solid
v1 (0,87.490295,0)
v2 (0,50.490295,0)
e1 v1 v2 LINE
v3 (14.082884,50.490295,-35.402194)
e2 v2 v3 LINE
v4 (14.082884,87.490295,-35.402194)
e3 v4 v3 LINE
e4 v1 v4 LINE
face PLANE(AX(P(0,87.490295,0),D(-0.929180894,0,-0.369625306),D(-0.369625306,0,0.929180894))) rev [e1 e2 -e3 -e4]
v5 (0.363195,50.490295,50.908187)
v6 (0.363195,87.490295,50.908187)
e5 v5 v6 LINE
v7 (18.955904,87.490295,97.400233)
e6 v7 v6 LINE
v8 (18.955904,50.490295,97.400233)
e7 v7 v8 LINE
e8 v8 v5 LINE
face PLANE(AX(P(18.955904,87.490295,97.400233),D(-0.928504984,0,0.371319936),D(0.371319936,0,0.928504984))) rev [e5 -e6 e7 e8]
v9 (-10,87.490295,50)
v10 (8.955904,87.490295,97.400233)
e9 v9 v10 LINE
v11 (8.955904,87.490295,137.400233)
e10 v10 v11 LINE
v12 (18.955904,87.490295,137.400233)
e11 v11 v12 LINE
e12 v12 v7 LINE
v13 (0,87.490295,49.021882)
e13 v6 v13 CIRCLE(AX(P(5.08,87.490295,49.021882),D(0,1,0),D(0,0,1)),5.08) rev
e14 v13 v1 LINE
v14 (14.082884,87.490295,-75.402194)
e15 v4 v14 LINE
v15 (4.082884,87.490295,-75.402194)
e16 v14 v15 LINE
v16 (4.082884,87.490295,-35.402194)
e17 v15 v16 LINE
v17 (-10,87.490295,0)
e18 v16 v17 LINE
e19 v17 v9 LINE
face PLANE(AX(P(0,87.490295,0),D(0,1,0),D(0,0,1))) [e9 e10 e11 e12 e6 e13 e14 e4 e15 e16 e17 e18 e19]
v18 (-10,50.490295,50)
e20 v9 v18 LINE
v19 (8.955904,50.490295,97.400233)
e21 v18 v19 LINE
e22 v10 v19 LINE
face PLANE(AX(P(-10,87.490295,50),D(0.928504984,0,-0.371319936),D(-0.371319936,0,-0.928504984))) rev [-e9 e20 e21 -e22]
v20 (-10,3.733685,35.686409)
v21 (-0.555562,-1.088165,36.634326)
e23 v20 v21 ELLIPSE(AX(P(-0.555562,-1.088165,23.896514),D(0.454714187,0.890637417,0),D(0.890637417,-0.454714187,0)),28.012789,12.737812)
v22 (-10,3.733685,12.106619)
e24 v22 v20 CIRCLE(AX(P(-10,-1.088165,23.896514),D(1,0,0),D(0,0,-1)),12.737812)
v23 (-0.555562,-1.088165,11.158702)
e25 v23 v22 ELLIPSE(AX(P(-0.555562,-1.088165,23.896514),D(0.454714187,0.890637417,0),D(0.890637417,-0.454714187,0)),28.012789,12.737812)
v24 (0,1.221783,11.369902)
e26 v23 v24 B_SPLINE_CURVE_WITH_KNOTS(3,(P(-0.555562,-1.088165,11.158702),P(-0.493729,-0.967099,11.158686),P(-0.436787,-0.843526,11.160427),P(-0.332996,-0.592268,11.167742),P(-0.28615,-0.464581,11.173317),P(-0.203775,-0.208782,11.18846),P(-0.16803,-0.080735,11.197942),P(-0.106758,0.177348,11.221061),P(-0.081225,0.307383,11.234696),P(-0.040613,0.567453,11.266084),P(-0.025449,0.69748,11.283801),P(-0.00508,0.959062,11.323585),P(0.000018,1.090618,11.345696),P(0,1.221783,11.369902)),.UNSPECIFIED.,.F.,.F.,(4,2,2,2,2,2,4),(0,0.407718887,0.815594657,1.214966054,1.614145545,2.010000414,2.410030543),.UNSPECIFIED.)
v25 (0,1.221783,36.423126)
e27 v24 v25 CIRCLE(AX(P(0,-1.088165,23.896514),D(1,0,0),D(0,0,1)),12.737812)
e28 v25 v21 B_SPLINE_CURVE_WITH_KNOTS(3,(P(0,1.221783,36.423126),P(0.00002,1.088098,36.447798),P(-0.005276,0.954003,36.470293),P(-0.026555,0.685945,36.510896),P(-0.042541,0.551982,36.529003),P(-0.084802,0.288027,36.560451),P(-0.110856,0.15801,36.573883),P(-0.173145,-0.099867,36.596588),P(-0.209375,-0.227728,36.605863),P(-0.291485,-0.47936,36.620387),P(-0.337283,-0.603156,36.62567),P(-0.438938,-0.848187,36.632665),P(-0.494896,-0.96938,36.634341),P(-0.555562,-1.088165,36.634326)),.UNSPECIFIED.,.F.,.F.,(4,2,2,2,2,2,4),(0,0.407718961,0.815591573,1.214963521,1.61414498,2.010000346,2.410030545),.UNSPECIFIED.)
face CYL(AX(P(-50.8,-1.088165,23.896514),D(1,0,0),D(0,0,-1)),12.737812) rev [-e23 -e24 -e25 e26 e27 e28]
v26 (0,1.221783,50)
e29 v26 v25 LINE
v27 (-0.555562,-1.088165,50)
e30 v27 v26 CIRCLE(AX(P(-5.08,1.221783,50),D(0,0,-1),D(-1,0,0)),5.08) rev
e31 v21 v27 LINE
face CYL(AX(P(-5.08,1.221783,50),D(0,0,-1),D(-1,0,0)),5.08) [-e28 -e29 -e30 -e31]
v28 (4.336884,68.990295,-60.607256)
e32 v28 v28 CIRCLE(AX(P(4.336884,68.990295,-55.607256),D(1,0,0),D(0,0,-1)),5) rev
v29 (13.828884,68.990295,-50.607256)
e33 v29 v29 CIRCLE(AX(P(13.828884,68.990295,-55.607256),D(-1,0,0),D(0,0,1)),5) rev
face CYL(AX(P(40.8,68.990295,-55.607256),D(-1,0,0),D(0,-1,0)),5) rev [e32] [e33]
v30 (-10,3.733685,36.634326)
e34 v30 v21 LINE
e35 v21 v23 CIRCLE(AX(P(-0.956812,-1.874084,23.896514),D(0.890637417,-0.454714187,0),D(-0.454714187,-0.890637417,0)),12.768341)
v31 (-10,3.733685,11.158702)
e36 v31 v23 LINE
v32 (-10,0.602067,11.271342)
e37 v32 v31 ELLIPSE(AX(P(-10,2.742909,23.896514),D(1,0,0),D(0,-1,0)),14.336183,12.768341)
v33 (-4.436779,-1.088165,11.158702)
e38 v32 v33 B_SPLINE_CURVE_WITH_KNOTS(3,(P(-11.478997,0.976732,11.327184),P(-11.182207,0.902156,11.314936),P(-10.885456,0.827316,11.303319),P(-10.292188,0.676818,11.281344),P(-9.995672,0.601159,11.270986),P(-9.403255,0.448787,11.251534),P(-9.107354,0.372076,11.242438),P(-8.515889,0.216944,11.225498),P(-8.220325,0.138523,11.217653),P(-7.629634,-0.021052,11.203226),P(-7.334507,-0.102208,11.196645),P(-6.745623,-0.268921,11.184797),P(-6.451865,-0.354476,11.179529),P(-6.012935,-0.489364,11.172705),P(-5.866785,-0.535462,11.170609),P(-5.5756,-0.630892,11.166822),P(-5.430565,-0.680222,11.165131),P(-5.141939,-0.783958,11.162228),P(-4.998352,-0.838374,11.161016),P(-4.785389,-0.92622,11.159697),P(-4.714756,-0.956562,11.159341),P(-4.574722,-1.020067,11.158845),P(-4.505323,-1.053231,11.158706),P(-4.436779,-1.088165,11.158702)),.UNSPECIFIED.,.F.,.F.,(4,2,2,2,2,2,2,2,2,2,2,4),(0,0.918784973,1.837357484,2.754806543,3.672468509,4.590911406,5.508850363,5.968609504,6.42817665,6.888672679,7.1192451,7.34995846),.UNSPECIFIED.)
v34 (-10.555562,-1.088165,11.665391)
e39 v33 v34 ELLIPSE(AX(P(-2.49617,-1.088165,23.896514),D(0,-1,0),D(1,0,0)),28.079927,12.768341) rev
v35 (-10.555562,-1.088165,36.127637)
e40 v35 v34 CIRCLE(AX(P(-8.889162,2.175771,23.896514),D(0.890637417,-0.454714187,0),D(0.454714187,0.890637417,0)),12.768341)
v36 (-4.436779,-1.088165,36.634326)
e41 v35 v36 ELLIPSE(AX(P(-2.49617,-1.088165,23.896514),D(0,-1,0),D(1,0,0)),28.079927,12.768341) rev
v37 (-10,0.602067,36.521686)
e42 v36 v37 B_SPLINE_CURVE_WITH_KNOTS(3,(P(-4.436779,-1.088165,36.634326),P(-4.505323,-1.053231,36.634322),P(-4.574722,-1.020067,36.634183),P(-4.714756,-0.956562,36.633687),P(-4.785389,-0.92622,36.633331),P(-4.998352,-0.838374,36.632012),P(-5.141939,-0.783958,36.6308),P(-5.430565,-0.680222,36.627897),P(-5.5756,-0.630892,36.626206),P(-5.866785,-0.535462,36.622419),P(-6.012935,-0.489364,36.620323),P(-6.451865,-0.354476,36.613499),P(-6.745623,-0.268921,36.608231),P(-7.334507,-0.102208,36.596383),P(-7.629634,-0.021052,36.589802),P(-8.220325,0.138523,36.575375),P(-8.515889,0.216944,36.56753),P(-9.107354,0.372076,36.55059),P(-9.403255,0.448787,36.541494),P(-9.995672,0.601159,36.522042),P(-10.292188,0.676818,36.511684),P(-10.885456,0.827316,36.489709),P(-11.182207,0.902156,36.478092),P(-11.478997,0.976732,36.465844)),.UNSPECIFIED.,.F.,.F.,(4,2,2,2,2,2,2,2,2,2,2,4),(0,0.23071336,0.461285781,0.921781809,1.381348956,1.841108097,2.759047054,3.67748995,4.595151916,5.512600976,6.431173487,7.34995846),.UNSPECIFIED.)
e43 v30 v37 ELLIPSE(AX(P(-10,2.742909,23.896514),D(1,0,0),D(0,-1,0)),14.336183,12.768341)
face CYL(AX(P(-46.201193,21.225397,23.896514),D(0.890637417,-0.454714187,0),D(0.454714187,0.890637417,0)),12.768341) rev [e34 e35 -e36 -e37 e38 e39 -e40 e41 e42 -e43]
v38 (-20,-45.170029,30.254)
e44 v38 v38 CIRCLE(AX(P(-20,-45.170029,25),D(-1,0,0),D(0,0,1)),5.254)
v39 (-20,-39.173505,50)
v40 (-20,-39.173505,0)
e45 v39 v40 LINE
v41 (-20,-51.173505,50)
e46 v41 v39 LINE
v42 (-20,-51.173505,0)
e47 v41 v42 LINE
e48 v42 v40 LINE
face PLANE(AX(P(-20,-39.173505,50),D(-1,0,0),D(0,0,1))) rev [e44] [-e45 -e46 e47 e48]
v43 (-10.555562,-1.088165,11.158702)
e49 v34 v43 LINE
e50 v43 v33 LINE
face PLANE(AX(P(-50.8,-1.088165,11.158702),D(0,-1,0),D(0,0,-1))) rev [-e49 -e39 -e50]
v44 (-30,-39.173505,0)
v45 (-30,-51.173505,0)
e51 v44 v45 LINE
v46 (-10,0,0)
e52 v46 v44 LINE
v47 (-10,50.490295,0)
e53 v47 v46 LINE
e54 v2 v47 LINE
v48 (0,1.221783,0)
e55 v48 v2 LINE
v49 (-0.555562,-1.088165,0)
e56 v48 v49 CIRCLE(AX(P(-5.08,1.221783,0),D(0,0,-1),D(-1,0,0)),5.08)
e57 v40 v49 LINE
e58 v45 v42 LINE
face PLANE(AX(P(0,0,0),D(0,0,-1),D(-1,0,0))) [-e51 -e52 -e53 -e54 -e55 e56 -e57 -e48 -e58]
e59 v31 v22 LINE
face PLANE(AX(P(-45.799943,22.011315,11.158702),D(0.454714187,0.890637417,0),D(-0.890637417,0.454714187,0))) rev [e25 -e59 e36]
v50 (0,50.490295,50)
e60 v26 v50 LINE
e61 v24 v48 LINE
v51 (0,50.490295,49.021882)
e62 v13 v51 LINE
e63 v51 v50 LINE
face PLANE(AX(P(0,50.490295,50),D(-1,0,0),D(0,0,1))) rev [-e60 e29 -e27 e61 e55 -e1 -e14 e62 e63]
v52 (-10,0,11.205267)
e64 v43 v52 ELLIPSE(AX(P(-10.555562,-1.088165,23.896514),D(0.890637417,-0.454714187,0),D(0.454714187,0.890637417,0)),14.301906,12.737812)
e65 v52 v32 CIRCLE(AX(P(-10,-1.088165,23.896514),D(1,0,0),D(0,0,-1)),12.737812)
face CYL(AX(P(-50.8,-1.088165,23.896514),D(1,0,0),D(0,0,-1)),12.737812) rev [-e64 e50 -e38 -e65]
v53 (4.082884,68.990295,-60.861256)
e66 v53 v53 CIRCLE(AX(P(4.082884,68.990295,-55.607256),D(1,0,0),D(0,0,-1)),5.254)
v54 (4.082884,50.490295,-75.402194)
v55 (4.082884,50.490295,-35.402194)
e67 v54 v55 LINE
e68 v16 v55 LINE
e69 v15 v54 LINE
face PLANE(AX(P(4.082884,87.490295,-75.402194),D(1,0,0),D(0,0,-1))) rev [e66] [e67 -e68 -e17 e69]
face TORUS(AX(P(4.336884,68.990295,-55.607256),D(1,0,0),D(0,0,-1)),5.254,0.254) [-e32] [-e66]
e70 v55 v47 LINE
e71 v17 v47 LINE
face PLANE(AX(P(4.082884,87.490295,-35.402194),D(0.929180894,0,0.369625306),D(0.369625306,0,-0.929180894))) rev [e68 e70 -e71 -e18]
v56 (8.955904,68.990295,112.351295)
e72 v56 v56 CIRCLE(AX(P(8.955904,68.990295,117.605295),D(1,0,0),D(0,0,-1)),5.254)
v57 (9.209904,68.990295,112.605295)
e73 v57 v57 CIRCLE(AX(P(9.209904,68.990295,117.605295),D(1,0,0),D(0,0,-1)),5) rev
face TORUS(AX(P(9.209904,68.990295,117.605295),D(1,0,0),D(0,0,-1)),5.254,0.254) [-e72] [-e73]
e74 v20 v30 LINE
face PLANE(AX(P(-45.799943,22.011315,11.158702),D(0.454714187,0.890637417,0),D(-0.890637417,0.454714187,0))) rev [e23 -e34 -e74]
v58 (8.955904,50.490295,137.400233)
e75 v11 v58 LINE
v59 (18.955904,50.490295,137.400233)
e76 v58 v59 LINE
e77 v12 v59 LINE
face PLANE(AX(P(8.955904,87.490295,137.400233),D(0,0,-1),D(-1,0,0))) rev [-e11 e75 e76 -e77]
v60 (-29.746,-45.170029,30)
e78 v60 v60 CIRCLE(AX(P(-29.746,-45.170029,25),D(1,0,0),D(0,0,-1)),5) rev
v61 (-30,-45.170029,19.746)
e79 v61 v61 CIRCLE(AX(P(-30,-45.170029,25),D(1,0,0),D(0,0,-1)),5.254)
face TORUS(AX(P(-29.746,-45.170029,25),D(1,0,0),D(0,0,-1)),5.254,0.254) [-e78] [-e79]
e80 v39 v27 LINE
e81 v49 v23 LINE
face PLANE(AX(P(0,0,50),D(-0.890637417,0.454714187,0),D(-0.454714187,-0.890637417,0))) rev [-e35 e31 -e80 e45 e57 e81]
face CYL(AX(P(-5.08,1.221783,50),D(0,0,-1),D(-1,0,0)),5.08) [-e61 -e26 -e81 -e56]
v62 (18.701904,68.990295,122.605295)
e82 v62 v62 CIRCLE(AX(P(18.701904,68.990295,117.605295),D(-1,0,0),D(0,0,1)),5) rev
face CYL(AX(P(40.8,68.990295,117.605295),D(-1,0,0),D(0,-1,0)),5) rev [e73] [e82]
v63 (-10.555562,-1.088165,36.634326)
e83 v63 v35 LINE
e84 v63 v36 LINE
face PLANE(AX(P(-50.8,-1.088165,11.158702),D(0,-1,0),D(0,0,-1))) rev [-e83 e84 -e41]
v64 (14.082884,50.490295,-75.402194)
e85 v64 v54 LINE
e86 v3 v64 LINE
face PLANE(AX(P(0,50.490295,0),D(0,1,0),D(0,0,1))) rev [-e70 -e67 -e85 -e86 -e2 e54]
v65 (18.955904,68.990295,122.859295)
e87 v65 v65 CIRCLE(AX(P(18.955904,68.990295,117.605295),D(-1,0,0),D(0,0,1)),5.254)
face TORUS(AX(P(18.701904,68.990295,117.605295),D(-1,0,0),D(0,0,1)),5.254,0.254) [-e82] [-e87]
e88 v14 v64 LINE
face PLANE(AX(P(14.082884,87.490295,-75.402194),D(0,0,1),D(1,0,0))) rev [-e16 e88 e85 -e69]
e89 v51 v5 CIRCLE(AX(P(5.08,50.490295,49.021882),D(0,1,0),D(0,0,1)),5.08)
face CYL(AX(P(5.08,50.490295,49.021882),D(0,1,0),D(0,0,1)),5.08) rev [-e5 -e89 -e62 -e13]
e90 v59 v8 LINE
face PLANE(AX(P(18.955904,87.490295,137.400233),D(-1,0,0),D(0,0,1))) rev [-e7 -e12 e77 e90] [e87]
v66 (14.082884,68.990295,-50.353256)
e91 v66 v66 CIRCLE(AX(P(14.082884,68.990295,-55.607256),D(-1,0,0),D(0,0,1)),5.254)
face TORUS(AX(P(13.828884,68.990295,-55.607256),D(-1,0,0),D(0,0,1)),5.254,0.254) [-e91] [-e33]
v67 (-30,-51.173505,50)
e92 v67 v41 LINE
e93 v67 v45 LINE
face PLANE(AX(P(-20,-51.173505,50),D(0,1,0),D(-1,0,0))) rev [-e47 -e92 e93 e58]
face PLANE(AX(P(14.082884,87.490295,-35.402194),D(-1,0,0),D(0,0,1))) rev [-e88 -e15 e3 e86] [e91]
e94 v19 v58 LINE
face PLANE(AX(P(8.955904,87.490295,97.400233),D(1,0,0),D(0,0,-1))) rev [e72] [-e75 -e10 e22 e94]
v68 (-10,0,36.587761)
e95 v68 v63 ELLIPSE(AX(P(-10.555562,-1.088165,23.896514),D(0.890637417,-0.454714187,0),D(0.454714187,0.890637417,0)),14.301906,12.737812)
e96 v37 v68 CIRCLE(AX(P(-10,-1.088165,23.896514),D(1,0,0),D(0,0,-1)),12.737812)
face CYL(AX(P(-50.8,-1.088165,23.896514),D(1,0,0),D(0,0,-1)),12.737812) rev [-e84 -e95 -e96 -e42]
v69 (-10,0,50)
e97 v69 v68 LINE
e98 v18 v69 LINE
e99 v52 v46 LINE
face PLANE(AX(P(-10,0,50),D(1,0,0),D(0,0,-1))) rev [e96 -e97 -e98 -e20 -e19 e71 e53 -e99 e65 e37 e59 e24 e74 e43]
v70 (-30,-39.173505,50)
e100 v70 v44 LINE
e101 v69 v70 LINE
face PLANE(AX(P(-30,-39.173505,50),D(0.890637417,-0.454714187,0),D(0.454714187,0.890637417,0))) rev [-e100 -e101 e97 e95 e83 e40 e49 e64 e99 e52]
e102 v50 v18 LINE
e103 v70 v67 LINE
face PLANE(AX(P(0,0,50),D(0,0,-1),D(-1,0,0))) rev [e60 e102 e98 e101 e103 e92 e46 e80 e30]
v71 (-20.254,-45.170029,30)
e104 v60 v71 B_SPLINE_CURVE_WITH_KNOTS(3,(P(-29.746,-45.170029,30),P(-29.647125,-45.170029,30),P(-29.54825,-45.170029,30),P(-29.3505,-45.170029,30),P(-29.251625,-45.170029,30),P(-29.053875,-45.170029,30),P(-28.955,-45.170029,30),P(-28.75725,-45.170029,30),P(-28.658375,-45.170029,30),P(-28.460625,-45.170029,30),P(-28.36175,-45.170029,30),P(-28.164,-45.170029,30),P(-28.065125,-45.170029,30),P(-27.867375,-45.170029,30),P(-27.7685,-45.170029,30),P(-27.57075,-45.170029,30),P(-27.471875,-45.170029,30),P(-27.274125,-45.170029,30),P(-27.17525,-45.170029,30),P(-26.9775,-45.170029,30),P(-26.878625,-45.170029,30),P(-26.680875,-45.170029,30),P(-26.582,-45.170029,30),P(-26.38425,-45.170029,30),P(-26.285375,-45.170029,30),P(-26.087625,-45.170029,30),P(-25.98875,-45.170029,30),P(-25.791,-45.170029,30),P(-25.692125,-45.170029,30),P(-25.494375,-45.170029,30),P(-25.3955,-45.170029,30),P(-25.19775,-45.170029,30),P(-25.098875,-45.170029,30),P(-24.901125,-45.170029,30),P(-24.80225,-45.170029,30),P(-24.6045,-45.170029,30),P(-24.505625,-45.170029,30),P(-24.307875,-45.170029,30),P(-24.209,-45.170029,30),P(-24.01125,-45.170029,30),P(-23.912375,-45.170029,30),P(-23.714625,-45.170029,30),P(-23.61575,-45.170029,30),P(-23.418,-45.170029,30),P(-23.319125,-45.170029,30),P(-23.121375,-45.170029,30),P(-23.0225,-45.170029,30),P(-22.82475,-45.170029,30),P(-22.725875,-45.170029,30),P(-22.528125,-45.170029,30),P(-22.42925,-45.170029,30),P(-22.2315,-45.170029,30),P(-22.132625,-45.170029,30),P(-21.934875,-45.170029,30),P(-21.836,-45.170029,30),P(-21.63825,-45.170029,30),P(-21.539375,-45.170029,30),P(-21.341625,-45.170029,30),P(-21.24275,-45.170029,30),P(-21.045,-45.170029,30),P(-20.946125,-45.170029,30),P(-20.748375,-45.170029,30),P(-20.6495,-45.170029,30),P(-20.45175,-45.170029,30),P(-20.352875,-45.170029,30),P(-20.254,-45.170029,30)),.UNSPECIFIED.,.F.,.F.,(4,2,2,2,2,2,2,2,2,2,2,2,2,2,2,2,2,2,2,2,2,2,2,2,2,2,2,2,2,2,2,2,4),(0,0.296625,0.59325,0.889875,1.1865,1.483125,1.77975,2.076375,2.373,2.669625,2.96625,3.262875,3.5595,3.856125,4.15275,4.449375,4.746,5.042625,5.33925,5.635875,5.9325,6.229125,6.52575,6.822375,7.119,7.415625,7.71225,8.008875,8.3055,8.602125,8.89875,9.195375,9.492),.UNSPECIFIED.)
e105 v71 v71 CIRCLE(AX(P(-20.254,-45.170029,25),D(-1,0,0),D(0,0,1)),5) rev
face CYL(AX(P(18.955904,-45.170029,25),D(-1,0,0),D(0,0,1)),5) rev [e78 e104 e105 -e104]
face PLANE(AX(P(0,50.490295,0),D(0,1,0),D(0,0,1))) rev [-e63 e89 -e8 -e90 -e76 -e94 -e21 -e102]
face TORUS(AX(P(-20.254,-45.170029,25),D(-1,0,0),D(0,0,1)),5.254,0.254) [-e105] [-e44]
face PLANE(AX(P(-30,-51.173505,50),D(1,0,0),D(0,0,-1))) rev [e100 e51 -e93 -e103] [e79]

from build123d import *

# Parameters (mm, degrees)
BOSS_EXTRUDE1_DEPTH = 50
BOSS_EXTRUDE2_DEPTH = 37
FILLET1_R           = 5.08
FILLET2_R           = 5.08
SKETCH3_R           = 5
CUT_EXTRUDE3_DEPTH  = 50.8
SKETCH4_R           = 5
CUT_EXTRUDE4_DEPTH  = 171.088377471
FILLET4_R           = 0.254
FILLET5_R           = 0.254
FILLET6_R           = 0.254
FILLET7_R           = 0.254
FILLET8_R           = 0.254
FILLET9_R           = 0.254
CUT_EXTRUDE10_DEPTH = 50.8
CUT_EXTRUDE11_DEPTH = 50.8


with BuildPart() as part:
    # Sketch1 → Boss-Extrude1 (new body)
    with BuildSketch(Plane.XY):
        Polygon((-10, 50.490294942), (0, 50.490294942), (0, 0), (-20, -39.173504696), (-20, -51.173504696), (-30, -51.173504696), (-30, -39.173504696), (-10, 0), align=None)
    extrude(amount=BOSS_EXTRUDE1_DEPTH)

    # Sketch2 → Boss-Extrude2 (add)
    with BuildSketch(Plane(origin=(0, 50.490294942, 0), x_dir=(1, 0, 0), z_dir=(0, 1, 0))):
        Polygon((-10, -50), (8.955903958, -97.400232567), (8.955903958, -137.400232567), (18.955903958, -137.400232567), (18.955903958, -97.400232567), (0, -50), (0, 0), (14.082883878, 35.4021936), (14.082883878, 75.4021936), (4.082883878, 75.4021936), (4.082883878, 35.4021936), (-10, 0), align=None)
    extrude(amount=BOSS_EXTRUDE2_DEPTH)

    # Fillet1
    fillet1_edges = [part.edges().sort_by_distance(p)[0] for p in [
        (0, 0, 25),
    ]]
    fillet(fillet1_edges, radius=FILLET1_R)

    # Fillet2
    # the kernel refuses this fillet: 5.08 mm, written as the material it adds along each edge
    with BuildSketch(Plane(origin=(0, 50.490294942, 50), x_dir=(0, 0, -1), z_dir=(0, 1, 0))) as fillet2_piece_1:
        with BuildLine():
            CenterArc((FILLET2_R * 0.192542896513, -FILLET2_R), FILLET2_R, 90, 21.797044179)
            Line((-FILLET2_R * 0.17877703906, -FILLET2_R * 0.0714950159281), (0, 0))
            Line((0, 0), (FILLET2_R * 0.192542896513, 0))
        make_face()
    extrude(amount=37)

    # Sketch3 → Cut-Extrude3 (cut)
    with BuildSketch(Plane.ZY.offset(10)):
        with Locations(Location((-55.607256236, 68.990294942, 0), (0, 0, 180))):
            Circle(SKETCH3_R)
        with Locations((117.605295203, 68.990294942)):
            Circle(SKETCH3_R)
    extrude(amount=-CUT_EXTRUDE3_DEPTH, mode=Mode.SUBTRACT)

    # Sketch4 → Cut-Extrude4 (cut, through all)
    with BuildSketch(Plane.ZY.offset(30)):
        with Locations((25, -45.170029219)):
            Circle(SKETCH4_R)
    extrude(amount=-CUT_EXTRUDE4_DEPTH, mode=Mode.SUBTRACT)

    # Fillet4
    fillet4_edges = [part.edges().sort_by_distance(p)[0] for p in [
        (-20, -45.170029219, 20),
    ]]
    fillet(fillet4_edges, radius=FILLET4_R)

    # Fillet5
    fillet5_edges = [part.edges().sort_by_distance(p)[0] for p in [
        (-30, -45.170029219, 20),
    ]]
    fillet(fillet5_edges, radius=FILLET5_R)

    # Fillet6
    fillet6_edges = [part.edges().sort_by_distance(p)[0] for p in [
        (14.082883878, 68.990294942, -50.607256236),
    ]]
    fillet(fillet6_edges, radius=FILLET6_R)

    # Fillet7
    fillet7_edges = [part.edges().sort_by_distance(p)[0] for p in [
        (4.082883878, 68.990294942, -50.607256236),
    ]]
    fillet(fillet7_edges, radius=FILLET7_R)

    # Fillet8
    fillet8_edges = [part.edges().sort_by_distance(p)[0] for p in [
        (18.955903958, 68.990294942, 112.605295203),
    ]]
    fillet(fillet8_edges, radius=FILLET8_R)

    # Fillet9
    fillet9_edges = [part.edges().sort_by_distance(p)[0] for p in [
        (8.955903958, 68.990294942, 112.605295203),
    ]]
    fillet(fillet9_edges, radius=FILLET9_R)

    # Sketch18 → Cut-Extrude10 (cut)
    with BuildSketch(Plane(origin=(0, 0, 0), x_dir=(-0.4547141869090671, -0.8906374168109186, 0), z_dir=(0.8906374168109186, -0.4547141869090671, 0))):
        with BuildLine():
            Line((1.22178269, -11.158701567), (1.22178269, -36.634326405))
            ThreePointArc((1.22178269, -36.634326405), (14.872545986, -23.896513986), (1.22178269, -11.158701567))
        make_face()
    extrude(amount=-CUT_EXTRUDE10_DEPTH, mode=Mode.SUBTRACT)

    # Sketch20 → Cut-Extrude11 (cut)
    with BuildSketch(Plane(origin=(0, 0, 0), x_dir=(0, 0, -1), z_dir=(1, 0, 0))):
        with BuildLine():
            Line((-11.158701567, -1.088165379), (-36.634326405, -1.088165379))
            ThreePointArc((-36.634326405, -1.088165379), (-23.896513986, 11.64964704), (-11.158701567, -1.088165379))
        make_face()
    extrude(amount=-CUT_EXTRUDE11_DEPTH, mode=Mode.SUBTRACT)


solid = part.part
